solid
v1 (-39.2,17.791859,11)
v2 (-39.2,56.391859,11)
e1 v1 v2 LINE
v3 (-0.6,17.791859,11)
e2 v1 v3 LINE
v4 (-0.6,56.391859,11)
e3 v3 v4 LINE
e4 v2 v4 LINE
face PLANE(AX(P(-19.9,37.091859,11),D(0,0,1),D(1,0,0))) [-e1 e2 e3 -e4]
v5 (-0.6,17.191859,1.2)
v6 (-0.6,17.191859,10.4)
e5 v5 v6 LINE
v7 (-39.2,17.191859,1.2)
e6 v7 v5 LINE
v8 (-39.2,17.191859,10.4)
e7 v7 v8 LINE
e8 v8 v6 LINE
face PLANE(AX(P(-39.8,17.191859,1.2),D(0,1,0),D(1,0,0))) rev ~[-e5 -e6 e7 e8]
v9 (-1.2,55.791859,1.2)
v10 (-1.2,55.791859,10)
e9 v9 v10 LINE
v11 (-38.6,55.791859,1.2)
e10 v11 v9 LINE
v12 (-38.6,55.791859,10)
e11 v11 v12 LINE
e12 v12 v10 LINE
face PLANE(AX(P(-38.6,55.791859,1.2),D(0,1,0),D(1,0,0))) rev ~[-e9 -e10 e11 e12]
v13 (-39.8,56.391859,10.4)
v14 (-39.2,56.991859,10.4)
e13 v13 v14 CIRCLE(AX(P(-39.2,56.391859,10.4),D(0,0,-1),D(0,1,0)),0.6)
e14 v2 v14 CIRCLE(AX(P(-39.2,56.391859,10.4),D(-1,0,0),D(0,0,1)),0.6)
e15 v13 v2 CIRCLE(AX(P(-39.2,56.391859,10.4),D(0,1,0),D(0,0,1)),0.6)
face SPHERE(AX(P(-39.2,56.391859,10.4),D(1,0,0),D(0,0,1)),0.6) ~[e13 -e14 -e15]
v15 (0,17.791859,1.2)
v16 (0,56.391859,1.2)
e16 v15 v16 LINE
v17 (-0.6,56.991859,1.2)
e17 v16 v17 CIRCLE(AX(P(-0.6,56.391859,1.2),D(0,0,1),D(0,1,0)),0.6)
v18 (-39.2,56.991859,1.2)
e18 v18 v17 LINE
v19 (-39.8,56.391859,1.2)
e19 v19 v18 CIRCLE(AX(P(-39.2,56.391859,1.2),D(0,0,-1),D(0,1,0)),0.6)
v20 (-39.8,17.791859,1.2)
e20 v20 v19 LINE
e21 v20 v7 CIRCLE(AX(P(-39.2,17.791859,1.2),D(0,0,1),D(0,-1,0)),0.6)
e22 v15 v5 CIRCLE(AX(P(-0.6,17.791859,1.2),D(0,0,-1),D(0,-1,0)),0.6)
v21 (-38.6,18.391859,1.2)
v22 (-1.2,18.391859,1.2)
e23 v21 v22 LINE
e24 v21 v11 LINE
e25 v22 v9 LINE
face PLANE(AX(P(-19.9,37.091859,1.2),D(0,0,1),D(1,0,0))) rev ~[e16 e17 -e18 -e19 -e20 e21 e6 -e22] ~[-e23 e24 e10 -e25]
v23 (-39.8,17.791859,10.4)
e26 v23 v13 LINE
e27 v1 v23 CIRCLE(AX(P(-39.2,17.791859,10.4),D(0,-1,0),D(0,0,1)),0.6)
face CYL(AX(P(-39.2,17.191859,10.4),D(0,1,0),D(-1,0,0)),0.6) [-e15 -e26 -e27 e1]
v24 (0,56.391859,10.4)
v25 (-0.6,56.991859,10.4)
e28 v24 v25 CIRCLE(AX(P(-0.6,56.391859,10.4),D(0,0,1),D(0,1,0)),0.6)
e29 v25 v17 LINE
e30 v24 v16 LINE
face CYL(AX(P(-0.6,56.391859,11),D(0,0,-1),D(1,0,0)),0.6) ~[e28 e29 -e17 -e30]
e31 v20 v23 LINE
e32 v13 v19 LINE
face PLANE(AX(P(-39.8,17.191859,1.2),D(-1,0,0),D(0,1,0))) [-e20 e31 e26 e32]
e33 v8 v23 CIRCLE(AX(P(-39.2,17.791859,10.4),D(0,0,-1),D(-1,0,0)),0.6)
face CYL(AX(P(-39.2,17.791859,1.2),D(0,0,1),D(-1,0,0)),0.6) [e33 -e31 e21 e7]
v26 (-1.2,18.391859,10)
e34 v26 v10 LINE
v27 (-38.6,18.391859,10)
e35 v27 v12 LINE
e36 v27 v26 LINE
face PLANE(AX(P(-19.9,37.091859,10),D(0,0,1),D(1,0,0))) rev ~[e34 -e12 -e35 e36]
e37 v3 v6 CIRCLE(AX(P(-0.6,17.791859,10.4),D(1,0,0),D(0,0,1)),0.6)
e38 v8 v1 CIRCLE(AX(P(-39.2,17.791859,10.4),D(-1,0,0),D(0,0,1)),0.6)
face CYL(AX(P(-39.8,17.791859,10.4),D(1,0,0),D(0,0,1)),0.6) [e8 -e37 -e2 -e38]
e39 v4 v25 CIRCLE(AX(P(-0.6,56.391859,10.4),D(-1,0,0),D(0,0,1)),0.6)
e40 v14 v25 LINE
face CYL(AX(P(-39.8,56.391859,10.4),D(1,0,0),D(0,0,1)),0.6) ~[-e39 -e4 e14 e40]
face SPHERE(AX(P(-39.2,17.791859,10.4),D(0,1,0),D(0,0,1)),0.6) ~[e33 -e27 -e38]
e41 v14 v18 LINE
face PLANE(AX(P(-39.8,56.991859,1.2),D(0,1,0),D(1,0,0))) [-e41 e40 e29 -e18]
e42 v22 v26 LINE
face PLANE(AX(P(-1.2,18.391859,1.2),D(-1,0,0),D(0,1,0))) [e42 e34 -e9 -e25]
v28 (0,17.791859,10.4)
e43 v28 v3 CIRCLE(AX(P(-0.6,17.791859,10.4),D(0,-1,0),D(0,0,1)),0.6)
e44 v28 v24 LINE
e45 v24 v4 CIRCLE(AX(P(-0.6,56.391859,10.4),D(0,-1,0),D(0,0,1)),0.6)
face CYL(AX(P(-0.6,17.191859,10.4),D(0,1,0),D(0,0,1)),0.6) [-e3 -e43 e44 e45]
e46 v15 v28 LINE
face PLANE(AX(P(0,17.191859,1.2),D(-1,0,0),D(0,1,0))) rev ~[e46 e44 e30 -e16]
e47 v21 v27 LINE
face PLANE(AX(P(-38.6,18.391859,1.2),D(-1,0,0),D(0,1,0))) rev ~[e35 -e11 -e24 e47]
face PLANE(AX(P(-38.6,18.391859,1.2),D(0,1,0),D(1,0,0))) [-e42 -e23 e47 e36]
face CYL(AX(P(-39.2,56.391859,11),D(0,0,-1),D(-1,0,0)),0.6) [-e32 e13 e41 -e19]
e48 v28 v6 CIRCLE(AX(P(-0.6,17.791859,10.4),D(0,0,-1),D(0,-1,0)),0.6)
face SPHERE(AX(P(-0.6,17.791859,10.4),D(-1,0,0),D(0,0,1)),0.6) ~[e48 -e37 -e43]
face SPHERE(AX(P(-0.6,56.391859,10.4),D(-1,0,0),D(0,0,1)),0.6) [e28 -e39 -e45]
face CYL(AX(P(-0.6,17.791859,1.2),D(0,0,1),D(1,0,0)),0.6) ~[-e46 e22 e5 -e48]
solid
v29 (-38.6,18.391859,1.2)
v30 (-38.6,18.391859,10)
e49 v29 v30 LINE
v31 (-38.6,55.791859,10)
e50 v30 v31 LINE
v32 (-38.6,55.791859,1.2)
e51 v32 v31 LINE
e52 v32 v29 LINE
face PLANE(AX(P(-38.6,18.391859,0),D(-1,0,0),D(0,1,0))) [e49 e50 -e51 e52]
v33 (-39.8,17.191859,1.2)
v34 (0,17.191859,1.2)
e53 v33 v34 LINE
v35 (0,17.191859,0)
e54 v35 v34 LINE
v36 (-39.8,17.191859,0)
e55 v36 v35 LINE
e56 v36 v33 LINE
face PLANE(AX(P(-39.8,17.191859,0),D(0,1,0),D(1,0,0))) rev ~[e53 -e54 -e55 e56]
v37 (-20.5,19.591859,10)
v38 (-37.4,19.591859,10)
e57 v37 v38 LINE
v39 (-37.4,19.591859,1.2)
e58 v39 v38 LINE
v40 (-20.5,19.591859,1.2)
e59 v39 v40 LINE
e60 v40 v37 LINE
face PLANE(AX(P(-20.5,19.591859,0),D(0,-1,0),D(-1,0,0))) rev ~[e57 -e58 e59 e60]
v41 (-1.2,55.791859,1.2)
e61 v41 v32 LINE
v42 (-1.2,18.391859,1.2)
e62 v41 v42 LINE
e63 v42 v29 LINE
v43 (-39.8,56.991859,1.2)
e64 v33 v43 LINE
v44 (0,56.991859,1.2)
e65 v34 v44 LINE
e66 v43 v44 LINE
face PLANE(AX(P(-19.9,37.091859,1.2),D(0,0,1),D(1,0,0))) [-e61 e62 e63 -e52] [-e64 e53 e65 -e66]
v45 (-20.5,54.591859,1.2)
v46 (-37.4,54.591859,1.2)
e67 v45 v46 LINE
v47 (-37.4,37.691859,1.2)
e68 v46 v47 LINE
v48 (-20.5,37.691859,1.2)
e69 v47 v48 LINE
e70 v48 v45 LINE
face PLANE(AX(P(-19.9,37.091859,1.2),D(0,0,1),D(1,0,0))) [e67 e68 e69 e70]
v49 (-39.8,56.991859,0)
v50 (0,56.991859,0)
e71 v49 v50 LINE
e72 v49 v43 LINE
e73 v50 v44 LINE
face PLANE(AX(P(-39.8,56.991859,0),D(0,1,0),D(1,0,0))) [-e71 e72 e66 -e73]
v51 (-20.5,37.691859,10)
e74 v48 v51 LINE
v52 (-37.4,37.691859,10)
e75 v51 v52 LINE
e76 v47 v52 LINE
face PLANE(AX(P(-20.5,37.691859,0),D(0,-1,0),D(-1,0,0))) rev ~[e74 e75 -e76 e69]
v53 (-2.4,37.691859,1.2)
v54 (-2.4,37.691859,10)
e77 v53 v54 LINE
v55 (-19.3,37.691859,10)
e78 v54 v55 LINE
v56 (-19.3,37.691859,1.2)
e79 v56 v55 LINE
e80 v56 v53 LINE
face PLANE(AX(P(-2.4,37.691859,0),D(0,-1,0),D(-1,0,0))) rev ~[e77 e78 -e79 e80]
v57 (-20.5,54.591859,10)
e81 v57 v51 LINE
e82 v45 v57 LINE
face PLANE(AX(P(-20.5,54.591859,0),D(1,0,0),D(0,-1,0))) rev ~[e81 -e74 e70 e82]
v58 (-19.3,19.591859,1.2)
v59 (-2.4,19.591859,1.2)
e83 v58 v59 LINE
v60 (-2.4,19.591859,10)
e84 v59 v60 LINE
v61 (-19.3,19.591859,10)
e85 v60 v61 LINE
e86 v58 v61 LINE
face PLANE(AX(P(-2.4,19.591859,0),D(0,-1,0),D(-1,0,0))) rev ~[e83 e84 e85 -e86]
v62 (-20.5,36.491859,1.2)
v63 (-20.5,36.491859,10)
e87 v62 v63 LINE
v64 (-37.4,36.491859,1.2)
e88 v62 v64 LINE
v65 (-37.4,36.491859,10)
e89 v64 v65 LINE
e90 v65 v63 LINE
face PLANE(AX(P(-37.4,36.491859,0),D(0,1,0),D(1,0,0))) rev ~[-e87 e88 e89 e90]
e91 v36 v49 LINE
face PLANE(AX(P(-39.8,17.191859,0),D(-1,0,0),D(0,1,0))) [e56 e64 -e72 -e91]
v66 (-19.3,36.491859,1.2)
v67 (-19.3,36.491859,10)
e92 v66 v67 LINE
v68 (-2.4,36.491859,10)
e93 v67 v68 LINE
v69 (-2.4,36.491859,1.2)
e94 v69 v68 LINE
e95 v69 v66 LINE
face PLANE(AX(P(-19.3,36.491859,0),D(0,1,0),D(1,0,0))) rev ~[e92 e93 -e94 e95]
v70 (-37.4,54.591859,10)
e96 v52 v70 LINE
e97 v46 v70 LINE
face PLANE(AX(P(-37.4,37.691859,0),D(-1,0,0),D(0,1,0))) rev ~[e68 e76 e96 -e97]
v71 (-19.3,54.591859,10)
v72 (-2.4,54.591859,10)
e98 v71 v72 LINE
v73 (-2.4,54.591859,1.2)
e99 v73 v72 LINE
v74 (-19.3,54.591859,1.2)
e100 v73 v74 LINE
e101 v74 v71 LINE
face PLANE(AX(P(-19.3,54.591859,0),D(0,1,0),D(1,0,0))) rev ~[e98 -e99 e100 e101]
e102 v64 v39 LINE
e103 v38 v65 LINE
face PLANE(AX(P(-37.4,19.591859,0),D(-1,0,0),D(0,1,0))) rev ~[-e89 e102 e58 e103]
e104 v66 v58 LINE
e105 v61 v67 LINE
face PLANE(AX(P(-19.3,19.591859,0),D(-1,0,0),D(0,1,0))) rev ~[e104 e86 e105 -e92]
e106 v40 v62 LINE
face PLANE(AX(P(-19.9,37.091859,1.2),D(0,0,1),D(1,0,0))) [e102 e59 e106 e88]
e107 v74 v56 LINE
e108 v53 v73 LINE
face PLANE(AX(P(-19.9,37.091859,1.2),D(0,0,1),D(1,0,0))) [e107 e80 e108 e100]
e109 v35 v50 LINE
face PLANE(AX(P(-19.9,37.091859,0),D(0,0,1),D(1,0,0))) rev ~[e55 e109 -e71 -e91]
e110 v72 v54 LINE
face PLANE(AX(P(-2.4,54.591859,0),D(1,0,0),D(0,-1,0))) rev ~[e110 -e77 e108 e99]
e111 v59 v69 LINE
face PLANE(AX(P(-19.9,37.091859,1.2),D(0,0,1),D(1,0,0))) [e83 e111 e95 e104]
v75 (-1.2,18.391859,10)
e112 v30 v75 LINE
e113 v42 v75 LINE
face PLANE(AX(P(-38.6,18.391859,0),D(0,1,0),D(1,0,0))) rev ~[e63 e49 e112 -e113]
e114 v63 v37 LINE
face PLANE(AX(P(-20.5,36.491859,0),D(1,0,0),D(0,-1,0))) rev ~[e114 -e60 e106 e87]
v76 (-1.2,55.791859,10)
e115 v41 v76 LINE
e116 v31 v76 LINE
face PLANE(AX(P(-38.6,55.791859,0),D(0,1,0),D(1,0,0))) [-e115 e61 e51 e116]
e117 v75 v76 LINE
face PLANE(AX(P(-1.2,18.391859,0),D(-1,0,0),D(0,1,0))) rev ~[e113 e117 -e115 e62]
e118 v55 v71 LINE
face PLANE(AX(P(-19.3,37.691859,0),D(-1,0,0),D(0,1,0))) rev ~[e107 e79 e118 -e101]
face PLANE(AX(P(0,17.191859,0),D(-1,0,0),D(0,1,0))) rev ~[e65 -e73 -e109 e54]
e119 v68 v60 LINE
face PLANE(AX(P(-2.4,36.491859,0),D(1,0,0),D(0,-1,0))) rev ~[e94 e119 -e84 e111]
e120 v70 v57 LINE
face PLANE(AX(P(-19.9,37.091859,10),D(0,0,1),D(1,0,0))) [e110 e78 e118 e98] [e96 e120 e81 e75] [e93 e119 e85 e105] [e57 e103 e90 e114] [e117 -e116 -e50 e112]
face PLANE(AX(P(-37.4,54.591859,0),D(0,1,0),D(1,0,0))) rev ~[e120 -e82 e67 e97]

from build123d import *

# Parameters (mm, degrees)
F0_W     = 39.8
F0_H     = 39.8
F0_W_2   = 37.4
F0_H_2   = 37.4
F0_W_3   = 16.9
F0_H_3   = 16.9
F1_DEPTH = 1.2
F2_DEPTH = 10
F3_START = 1.2
F3_DEPTH = 9.8
F4_START = 10
F4_DEPTH = 1
F5_R     = 0.6


with BuildPart() as f1:
    # F0 (on Top) → F1 (new body)
    with BuildSketch(Plane.XY):
        with Locations((-19.9, 37.0918591321)):
            Rectangle(F0_W, F0_H)
        with Locations((-19.9, 37.0918591321)):
            Rectangle(F0_W_2, F0_H_2, mode=Mode.SUBTRACT)
        with Locations((-19.9, 37.0918591321)):
            Rectangle(F0_W_2, F0_H_2)
        Polygon((-37.4, 37.6918591321), (-37.4, 54.5918591321), (-20.5, 54.5918591321), (-19.3, 54.5918591321), (-2.4, 54.5918591321), (-2.4, 37.6918591321), (-2.4, 36.4918591321), (-2.4, 19.5918591321), (-19.3, 19.5918591321), (-20.5, 19.5918591321), (-37.4, 19.5918591321), (-37.4, 36.4918591321), align=None, mode=Mode.SUBTRACT)
        with Locations((-10.85, 46.1418591321)):
            Rectangle(F0_W_3, F0_H_3)
        with Locations((-28.95, 28.0418591321)):
            Rectangle(F0_W_3, F0_H_3)
        with Locations((-28.95, 46.1418591321)):
            Rectangle(F0_W_3, F0_H_3)
        with Locations((-10.85, 28.0418591321)):
            Rectangle(F0_W_3, F0_H_3)
        Polygon((-19.3, 54.5918591321), (-20.5, 54.5918591321), (-20.5, 37.6918591321), (-37.4, 37.6918591321), (-37.4, 36.4918591321), (-20.5, 36.4918591321), (-20.5, 19.5918591321), (-19.3, 19.5918591321), (-19.3, 36.4918591321), (-2.4, 36.4918591321), (-2.4, 37.6918591321), (-19.3, 37.6918591321), align=None)
    extrude(amount=F1_DEPTH)

    # F0 (on Top) → F2 (join)
    with BuildSketch(Plane.XY):
        with Locations((-19.9, 37.0918591321)):
            Rectangle(F0_W_2, F0_H_2)
        Polygon((-37.4, 37.6918591321), (-37.4, 54.5918591321), (-20.5, 54.5918591321), (-19.3, 54.5918591321), (-2.4, 54.5918591321), (-2.4, 37.6918591321), (-2.4, 36.4918591321), (-2.4, 19.5918591321), (-19.3, 19.5918591321), (-20.5, 19.5918591321), (-37.4, 19.5918591321), (-37.4, 36.4918591321), align=None, mode=Mode.SUBTRACT)
        Polygon((-19.3, 54.5918591321), (-20.5, 54.5918591321), (-20.5, 37.6918591321), (-37.4, 37.6918591321), (-37.4, 36.4918591321), (-20.5, 36.4918591321), (-20.5, 19.5918591321), (-19.3, 19.5918591321), (-19.3, 36.4918591321), (-2.4, 36.4918591321), (-2.4, 37.6918591321), (-19.3, 37.6918591321), align=None)
    extrude(amount=F2_DEPTH)


with BuildPart() as f3:
    # F0 (on Top) → F3 (new body)
    with BuildSketch(Plane.XY.offset(F3_START)):
        with Locations((-19.9, 37.0918591321)):
            Rectangle(F0_W, F0_H)
        with Locations((-19.9, 37.0918591321)):
            Rectangle(F0_W_2, F0_H_2, mode=Mode.SUBTRACT)
    extrude(amount=F3_DEPTH)

    # F0 (on Top) → F4 (join)
    with BuildSketch(Plane.XY.offset(F4_START)):
        with Locations((-19.9, 37.0918591321)):
            Rectangle(F0_W, F0_H)
        with Locations((-19.9, 37.0918591321)):
            Rectangle(F0_W_2, F0_H_2, mode=Mode.SUBTRACT)
        with Locations((-19.9, 37.0918591321)):
            Rectangle(F0_W_2, F0_H_2)
        Polygon((-37.4, 37.6918591321), (-37.4, 54.5918591321), (-20.5, 54.5918591321), (-19.3, 54.5918591321), (-2.4, 54.5918591321), (-2.4, 37.6918591321), (-2.4, 36.4918591321), (-2.4, 19.5918591321), (-19.3, 19.5918591321), (-20.5, 19.5918591321), (-37.4, 19.5918591321), (-37.4, 36.4918591321), align=None, mode=Mode.SUBTRACT)
        with Locations((-28.95, 46.1418591321)):
            Rectangle(F0_W_3, F0_H_3)
        with Locations((-10.85, 46.1418591321)):
            Rectangle(F0_W_3, F0_H_3)
        with Locations((-10.85, 28.0418591321)):
            Rectangle(F0_W_3, F0_H_3)
        with Locations((-28.95, 28.0418591321)):
            Rectangle(F0_W_3, F0_H_3)
        Polygon((-19.3, 54.5918591321), (-20.5, 54.5918591321), (-20.5, 37.6918591321), (-37.4, 37.6918591321), (-37.4, 36.4918591321), (-20.5, 36.4918591321), (-20.5, 19.5918591321), (-19.3, 19.5918591321), (-19.3, 36.4918591321), (-2.4, 36.4918591321), (-2.4, 37.6918591321), (-19.3, 37.6918591321), align=None)
    extrude(amount=F4_DEPTH)

    # F5
    f5_edges = [f3.edges().sort_by_distance(p)[0] for p in [
        (-19.9, 56.991859, 11),
        (-39.8, 37.091859, 11),
        (-19.9, 17.191859, 11),
        (0, 37.091859, 11),
        (-39.8, 56.991859, 6.1),
        (-39.8, 17.191859, 6.1),
        (0, 17.191859, 6.1),
        (0, 56.991859, 6.1),
    ]]
    fillet(f5_edges, radius=F5_R)


solid = Compound([f1.part, f3.part])
